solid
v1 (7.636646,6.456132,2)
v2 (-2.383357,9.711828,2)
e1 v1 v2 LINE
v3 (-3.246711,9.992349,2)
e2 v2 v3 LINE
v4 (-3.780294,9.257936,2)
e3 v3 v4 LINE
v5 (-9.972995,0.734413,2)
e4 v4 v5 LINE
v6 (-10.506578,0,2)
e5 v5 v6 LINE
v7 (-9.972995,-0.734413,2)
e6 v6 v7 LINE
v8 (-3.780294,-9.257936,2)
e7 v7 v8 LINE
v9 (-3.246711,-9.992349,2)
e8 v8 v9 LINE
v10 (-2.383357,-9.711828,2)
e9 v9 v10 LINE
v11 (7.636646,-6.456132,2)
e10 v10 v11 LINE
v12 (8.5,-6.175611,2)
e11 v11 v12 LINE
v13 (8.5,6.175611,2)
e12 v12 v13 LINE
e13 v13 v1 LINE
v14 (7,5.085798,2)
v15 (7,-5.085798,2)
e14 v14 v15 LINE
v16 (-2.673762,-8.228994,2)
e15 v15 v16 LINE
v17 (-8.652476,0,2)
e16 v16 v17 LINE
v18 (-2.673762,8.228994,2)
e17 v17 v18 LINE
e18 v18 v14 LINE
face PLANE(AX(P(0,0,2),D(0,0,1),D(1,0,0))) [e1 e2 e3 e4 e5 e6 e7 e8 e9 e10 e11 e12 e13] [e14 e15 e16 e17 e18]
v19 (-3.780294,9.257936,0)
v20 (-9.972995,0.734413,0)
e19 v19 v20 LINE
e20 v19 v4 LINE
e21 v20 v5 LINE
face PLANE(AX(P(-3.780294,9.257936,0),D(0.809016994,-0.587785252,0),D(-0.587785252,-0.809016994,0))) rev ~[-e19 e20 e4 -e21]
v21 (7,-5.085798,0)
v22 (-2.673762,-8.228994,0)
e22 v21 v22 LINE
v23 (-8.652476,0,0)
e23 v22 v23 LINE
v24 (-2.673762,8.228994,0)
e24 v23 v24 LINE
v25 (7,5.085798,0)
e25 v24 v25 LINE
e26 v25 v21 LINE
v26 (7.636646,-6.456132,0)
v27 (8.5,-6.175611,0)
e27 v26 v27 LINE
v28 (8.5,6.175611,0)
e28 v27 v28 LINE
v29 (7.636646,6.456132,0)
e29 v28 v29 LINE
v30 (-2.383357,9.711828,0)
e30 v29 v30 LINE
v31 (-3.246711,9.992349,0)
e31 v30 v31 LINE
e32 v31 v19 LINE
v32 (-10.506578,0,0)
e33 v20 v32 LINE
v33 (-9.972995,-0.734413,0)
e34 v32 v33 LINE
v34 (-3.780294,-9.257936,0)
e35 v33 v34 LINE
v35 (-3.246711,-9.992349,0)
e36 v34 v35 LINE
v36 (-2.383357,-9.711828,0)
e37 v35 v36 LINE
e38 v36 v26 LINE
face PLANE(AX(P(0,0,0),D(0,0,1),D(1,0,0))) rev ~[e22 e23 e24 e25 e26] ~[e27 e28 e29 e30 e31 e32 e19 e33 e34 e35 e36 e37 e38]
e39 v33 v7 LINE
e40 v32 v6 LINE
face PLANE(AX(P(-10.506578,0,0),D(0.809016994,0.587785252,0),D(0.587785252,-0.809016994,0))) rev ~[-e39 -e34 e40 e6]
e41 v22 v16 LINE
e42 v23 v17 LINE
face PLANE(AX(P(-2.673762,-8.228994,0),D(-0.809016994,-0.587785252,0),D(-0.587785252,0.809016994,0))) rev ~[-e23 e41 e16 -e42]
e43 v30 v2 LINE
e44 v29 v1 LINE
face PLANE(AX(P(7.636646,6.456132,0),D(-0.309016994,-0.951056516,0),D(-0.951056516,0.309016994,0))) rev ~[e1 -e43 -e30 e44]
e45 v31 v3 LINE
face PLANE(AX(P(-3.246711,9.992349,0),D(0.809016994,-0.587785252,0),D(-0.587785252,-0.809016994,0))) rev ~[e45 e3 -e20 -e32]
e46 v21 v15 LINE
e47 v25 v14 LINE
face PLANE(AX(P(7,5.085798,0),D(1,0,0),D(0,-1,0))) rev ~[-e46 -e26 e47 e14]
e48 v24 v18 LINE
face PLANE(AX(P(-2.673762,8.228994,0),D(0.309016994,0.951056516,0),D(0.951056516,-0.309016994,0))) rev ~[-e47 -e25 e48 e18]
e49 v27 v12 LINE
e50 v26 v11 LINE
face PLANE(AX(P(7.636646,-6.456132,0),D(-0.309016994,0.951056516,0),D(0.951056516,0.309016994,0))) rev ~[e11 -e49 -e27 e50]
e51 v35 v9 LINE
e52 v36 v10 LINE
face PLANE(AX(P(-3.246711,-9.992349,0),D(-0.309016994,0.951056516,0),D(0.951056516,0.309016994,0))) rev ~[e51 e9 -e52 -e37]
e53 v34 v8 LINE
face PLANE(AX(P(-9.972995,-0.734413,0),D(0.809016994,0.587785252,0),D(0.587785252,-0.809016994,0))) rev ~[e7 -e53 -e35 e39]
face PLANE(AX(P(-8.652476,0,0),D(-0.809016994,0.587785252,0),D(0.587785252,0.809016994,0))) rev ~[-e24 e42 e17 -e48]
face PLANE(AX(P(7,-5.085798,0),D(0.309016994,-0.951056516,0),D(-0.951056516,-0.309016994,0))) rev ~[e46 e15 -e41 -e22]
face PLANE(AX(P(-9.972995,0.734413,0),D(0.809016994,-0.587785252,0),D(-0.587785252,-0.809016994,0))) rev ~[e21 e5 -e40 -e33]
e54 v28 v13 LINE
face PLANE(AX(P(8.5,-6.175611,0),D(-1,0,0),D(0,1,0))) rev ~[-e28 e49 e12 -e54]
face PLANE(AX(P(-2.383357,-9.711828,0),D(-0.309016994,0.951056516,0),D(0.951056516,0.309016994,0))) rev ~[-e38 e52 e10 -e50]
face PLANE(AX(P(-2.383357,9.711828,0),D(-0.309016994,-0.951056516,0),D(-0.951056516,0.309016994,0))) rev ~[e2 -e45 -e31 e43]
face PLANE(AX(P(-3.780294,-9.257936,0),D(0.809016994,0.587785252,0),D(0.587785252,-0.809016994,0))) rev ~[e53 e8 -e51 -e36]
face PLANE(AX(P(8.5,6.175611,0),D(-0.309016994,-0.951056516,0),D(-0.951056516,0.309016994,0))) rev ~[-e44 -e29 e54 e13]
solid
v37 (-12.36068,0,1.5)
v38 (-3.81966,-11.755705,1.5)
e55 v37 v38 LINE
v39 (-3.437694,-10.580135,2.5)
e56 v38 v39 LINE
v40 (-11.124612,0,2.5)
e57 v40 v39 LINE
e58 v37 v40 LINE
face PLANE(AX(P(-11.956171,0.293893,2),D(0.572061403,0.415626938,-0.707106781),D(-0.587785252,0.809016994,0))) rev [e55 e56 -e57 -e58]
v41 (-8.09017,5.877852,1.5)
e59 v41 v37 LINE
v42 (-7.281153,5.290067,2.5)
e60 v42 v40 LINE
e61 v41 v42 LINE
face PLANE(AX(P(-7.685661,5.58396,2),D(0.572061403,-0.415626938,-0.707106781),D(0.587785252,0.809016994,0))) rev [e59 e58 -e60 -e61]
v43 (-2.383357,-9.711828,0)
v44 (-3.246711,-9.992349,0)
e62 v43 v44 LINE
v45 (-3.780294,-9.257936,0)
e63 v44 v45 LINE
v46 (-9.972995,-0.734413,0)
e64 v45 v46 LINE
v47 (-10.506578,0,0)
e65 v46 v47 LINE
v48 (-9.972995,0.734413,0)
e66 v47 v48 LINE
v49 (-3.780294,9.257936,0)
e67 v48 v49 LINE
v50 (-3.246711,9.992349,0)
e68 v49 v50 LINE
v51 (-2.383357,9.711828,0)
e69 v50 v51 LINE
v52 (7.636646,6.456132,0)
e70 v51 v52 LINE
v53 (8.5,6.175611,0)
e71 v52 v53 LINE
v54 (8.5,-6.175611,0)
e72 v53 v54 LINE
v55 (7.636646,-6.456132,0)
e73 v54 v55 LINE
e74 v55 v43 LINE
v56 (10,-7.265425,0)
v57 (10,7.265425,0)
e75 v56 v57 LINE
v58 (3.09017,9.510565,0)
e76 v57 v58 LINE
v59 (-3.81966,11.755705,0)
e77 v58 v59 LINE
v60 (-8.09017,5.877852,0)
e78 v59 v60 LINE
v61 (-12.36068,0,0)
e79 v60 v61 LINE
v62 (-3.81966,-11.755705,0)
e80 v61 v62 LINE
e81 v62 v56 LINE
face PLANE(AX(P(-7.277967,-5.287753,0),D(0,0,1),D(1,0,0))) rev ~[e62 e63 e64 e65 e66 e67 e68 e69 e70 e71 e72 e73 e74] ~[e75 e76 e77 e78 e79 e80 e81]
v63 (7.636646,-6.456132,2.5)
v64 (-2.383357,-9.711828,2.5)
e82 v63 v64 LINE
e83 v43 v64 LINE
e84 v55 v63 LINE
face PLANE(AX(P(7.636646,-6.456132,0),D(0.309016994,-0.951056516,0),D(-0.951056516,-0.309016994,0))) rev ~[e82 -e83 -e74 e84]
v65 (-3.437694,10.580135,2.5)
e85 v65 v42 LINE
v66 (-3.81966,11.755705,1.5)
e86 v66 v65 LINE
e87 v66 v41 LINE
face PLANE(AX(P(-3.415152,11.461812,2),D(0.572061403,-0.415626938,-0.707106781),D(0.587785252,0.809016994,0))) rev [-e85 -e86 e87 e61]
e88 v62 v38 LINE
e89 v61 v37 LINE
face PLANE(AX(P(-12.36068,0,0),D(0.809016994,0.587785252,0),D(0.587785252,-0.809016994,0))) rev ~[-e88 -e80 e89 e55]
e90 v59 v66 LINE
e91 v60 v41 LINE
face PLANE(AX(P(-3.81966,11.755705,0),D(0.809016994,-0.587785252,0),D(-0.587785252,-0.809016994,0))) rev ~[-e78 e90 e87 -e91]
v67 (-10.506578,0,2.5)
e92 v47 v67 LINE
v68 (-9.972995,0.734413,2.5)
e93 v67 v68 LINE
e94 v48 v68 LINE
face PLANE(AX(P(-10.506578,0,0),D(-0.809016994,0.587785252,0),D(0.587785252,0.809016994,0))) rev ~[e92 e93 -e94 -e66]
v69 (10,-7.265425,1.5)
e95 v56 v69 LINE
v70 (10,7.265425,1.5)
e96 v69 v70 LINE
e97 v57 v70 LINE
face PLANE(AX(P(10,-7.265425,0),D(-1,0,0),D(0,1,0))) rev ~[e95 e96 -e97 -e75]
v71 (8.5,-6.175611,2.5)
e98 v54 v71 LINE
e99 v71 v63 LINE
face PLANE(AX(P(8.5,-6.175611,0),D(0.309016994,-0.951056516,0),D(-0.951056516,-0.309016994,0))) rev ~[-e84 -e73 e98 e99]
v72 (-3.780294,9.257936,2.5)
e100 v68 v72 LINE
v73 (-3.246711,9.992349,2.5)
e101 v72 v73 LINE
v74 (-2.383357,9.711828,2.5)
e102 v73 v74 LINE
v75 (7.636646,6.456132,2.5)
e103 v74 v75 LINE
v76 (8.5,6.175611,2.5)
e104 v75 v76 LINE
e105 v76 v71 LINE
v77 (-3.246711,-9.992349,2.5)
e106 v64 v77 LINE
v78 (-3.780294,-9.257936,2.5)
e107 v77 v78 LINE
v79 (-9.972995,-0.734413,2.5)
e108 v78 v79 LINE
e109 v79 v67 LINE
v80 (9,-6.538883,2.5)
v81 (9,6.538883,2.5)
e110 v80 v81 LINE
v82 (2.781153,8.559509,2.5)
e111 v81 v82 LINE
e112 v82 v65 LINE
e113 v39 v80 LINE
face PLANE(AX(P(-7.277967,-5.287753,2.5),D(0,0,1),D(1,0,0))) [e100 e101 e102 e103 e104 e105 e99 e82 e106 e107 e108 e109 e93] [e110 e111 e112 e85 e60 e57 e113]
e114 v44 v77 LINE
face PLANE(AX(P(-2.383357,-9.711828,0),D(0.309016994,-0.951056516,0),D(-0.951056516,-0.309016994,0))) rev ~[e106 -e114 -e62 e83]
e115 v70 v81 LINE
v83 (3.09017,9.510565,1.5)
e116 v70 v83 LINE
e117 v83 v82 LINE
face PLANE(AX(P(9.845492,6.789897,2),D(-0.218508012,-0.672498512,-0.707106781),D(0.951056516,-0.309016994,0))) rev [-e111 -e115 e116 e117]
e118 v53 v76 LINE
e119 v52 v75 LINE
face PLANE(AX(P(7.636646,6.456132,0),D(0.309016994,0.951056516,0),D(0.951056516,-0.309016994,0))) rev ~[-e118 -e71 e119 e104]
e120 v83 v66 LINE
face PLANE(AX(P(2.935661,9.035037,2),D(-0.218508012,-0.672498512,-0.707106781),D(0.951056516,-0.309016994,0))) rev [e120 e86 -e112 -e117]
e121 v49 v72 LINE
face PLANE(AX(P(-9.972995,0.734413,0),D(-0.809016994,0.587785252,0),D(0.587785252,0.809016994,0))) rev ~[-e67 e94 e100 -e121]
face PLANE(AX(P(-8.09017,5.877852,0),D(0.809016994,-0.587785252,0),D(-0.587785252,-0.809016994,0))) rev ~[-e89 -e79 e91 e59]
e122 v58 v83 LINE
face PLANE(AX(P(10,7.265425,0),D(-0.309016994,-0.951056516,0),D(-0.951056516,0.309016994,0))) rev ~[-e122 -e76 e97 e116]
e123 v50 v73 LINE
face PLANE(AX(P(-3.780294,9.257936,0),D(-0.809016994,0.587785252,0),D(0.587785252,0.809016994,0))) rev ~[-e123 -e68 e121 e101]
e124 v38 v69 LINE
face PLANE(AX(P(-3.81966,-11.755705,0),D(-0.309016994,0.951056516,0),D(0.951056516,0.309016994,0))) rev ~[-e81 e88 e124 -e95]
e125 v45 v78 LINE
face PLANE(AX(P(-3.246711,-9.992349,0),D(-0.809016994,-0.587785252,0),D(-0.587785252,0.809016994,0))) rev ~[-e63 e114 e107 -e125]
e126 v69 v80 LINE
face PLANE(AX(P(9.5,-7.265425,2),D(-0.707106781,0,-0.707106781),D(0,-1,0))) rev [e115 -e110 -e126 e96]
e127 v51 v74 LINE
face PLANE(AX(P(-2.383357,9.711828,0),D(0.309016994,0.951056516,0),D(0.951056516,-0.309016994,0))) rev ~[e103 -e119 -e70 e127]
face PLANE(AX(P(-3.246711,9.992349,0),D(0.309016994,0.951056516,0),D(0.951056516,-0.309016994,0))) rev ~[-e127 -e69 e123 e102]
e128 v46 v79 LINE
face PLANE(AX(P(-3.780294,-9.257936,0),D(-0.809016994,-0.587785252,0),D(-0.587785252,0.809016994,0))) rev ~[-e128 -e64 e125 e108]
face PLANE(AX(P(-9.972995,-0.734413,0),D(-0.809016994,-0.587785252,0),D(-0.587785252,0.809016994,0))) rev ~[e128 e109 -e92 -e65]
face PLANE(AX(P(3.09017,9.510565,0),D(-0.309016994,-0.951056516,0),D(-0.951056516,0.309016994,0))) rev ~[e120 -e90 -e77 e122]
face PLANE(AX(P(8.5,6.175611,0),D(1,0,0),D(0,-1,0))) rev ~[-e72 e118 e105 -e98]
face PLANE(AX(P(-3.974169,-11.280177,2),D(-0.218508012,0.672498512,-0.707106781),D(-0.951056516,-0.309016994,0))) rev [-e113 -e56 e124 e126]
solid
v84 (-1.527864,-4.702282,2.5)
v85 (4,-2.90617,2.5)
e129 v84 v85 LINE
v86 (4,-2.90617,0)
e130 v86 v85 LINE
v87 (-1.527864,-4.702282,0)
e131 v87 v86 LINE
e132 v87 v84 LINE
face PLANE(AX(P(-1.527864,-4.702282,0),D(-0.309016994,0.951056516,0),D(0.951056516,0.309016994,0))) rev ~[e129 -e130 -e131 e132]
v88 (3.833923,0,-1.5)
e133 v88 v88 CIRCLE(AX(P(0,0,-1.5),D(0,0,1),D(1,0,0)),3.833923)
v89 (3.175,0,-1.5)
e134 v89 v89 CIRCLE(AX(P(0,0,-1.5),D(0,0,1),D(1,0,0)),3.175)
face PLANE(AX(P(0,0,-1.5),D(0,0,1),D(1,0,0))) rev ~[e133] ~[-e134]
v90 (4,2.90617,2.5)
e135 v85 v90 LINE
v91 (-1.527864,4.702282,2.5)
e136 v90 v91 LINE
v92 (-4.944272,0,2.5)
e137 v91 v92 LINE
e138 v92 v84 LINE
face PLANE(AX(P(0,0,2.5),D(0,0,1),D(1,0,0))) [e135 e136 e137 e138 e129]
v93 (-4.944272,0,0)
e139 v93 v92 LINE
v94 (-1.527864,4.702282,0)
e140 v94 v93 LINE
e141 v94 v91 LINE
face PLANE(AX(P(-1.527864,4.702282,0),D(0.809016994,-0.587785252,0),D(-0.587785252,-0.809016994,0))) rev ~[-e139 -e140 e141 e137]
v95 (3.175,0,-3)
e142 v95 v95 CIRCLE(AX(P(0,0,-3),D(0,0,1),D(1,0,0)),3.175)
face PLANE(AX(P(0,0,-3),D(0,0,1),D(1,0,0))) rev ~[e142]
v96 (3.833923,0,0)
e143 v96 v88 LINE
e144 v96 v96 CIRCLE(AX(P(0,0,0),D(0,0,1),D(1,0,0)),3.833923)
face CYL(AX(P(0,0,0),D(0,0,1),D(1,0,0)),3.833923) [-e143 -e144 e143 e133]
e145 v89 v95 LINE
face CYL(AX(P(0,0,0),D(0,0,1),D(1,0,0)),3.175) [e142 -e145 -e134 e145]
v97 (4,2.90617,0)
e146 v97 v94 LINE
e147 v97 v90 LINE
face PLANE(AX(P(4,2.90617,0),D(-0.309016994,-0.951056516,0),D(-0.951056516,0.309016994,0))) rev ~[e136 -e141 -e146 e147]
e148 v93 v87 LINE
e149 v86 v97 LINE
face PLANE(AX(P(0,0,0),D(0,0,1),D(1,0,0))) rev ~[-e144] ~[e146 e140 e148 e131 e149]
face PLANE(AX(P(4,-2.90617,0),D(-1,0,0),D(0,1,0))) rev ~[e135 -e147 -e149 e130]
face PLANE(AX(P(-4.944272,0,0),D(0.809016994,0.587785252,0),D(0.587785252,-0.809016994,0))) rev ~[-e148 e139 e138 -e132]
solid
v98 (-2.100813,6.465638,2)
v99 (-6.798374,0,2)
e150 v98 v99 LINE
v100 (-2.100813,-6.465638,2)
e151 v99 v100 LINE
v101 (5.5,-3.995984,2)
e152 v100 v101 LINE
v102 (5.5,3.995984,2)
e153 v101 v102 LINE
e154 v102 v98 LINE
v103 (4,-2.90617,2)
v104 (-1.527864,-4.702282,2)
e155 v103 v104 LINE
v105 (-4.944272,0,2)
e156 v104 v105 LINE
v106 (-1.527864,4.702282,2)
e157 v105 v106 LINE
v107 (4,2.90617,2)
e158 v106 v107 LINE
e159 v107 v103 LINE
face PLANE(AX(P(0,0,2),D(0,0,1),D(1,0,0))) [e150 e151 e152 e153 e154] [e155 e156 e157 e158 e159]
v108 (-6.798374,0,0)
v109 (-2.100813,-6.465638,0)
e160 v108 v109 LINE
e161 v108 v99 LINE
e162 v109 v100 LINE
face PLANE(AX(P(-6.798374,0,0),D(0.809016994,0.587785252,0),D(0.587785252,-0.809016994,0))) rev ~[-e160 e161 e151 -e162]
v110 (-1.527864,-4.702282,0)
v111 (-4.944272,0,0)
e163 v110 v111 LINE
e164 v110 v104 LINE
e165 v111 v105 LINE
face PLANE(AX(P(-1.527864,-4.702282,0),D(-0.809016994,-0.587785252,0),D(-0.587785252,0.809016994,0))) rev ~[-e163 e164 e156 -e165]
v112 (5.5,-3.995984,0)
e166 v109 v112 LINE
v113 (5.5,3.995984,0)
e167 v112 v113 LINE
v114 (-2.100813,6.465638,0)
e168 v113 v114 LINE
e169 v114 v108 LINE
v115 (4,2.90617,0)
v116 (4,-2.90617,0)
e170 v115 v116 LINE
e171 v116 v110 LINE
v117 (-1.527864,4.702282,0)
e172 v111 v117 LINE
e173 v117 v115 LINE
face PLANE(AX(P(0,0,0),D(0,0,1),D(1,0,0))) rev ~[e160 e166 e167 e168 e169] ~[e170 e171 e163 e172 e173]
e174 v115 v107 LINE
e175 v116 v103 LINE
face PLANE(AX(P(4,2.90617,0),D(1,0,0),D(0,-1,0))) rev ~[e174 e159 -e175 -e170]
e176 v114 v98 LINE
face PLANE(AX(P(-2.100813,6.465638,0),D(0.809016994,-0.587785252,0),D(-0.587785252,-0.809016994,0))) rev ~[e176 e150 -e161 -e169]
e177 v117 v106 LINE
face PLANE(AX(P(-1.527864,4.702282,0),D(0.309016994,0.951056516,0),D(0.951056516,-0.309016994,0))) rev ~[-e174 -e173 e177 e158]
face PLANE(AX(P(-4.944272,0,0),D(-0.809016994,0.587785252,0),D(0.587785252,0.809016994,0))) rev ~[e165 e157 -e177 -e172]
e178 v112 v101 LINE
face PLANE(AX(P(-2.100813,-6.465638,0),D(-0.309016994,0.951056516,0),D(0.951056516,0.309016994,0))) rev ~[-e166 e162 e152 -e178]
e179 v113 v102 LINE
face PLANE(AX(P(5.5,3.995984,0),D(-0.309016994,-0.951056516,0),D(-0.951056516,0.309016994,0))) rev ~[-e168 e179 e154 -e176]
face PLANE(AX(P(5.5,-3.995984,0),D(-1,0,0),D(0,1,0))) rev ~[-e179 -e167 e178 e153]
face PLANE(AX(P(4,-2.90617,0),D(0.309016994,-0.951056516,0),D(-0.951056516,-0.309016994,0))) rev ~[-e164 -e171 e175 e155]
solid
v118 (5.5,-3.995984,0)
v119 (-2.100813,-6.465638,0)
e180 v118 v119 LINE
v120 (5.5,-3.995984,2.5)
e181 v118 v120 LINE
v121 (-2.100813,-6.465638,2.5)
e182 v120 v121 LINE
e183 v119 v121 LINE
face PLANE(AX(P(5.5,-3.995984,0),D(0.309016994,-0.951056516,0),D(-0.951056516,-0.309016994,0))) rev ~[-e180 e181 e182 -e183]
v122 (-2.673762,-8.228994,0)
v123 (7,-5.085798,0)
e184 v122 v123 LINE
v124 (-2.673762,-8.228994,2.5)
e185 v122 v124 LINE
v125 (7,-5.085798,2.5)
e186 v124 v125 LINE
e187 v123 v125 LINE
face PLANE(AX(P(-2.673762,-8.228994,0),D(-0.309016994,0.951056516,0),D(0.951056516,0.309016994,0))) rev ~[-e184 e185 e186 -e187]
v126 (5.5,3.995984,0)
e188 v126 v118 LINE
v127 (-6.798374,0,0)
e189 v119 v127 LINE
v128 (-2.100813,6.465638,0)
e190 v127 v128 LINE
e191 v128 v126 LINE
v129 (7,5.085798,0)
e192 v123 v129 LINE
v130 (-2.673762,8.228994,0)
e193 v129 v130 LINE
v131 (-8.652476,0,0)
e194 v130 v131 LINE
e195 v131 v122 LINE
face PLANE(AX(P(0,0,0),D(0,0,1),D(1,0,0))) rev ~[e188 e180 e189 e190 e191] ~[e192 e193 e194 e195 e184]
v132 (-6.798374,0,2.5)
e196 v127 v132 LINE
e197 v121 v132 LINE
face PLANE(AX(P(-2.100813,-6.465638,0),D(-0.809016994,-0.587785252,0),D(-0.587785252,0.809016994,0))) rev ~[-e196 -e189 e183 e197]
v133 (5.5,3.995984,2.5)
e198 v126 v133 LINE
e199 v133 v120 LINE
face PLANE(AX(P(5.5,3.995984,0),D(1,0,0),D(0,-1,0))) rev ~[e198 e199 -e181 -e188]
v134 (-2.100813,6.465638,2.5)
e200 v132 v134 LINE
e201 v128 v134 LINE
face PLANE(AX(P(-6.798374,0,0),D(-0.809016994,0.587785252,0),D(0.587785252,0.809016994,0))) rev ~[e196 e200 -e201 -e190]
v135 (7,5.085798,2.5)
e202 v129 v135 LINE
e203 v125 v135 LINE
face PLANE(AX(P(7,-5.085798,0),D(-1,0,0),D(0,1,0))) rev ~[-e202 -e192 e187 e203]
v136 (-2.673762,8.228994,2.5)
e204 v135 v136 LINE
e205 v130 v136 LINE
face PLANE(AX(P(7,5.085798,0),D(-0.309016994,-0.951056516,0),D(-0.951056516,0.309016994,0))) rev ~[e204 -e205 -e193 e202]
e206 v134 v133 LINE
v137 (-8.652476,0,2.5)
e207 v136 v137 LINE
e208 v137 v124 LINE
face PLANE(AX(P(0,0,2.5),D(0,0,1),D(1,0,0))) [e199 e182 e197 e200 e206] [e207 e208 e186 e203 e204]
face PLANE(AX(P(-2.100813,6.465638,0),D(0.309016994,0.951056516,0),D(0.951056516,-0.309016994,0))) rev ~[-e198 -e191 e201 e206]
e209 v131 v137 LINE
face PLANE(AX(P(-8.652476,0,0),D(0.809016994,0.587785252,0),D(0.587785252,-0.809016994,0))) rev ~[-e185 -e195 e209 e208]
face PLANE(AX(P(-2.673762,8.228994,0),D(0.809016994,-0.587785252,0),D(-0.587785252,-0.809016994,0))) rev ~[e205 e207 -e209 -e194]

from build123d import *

# Parameters (mm, degrees)
F0_R     = 3.8339233168
F0_R_2   = 3.175
F1_DEPTH = 2.5
F2_SIZE  = 1
F3_DEPTH = 3
F4_DEPTH = 1.5
F5_DEPTH = 2


with BuildPart() as f1:
    # F0 (on Top) → F1 (new body)
    with BuildSketch(Plane.XY):
        Polygon((4, -2.906170112), (4, 2.906170112), (-1.527864045, 4.7022820183), (-4.94427191, 0), (-1.527864045, -4.7022820183), align=None)
        Circle(F0_R, mode=Mode.SUBTRACT)
        Circle(F0_R)
        Circle(F0_R_2, mode=Mode.SUBTRACT)
        Circle(F0_R_2)
    extrude(amount=F1_DEPTH)

    # F0 (on Top) → F3 (join)
    with BuildSketch(Plane.XY):
        Circle(F0_R_2)
    extrude(amount=-F3_DEPTH)

    # F0 (on Top) → F4 (join)
    with BuildSketch(Plane.XY):
        Circle(F0_R)
        Circle(F0_R_2, mode=Mode.SUBTRACT)
    extrude(amount=-F4_DEPTH)


with BuildPart() as f1b:
    # F0 (on Top) → F1, piece 2 (new body)
    with BuildSketch(Plane.XY):
        Polygon((7, -5.085797696), (7, 5.085797696), (-2.6737620788, 8.2289935321), (-8.6524758425, 0), (-2.6737620788, -8.2289935321), align=None)
        Polygon((-2.1008130619, 6.4656377752), (5.5, 3.995983904), (5.5, -3.995983904), (-2.1008130619, -6.4656377752), (-6.7983738762, 0), align=None, mode=Mode.SUBTRACT)
    extrude(amount=F1_DEPTH)


with BuildPart() as f1c:
    # F0 (on Top) → F1, piece 3 (new body)
    with BuildSketch(Plane.XY):
        with BuildLine():
            ThreePointArc((-8.0901700058, -5.8778524375), (-6.1711601329, -7.8687217904), (-3.7802935026, -9.2579361109))
            Line((-3.7802935026, -9.2579361109), (-9.9729954018, -0.734413178))
            ThreePointArc((-9.9729954018, -0.734413178), (-9.390592526, -3.4375532011), (-8.0901700058, -5.8778524375))
        make_face()
        with BuildLine():
            ThreePointArc((-9.9729954018, 0.734413178), (-9.3905925168, 3.4375532262), (-8.0901699744, 5.8778524807))
            Line((-8.0901699744, 5.8778524807), (-12.360679775, 0))
            Line((-12.360679775, 0), (-8.0901700058, -5.8778524375))
            ThreePointArc((-8.0901700058, -5.8778524375), (-9.390592526, -3.4375532011), (-9.9729954018, -0.734413178))
            Line((-9.9729954018, -0.734413178), (-10.5065778087, 0))
            Line((-10.5065778087, 0), (-9.9729954018, 0.734413178))
        make_face()
        with BuildLine():
            Line((-3.8196601125, -11.7557050458), (3.0901696906, -9.5105652452))
            ThreePointArc((3.0901696906, -9.5105652452), (0.367454614, -9.9932465749), (-2.3833566254, -9.7118284167))
            Line((-2.3833566254, -9.7118284167), (-3.2467110956, -9.992349289))
            Line((-3.2467110956, -9.992349289), (-3.7802935026, -9.2579361109))
            ThreePointArc((-3.7802935026, -9.2579361109), (-6.1711601329, -7.8687217904), (-8.0901700058, -5.8778524375))
            Line((-8.0901700058, -5.8778524375), (-3.8196601125, -11.7557050458))
        make_face()
        with BuildLine():
            ThreePointArc((3.0901696906, -9.5105652452), (5.5766057109, -8.3006908595), (7.6366455297, -6.4561323603))
            Line((7.6366455297, -6.4561323603), (-2.3833566254, -9.7118284167))
            ThreePointArc((-2.3833566254, -9.7118284167), (0.367454614, -9.9932465749), (3.0901696906, -9.5105652452))
        make_face()
        with BuildLine():
            Line((10, -7.2654252801), (10, 0))
            ThreePointArc((10, 0), (9.6176920308, -2.7386127875), (8.5, -5.2678268764))
            Line((8.5, -5.2678268764), (8.5, -6.175611488))
            Line((8.5, -6.175611488), (7.6366455297, -6.4561323603))
            ThreePointArc((7.6366455297, -6.4561323603), (5.5766057109, -8.3006908595), (3.0901696906, -9.5105652452))
            Line((3.0901696906, -9.5105652452), (10, -7.2654252801))
        make_face()
        with BuildLine():
            ThreePointArc((8.5, -5.2678268764), (9.6176920308, -2.7386127875), (10, 0))
            ThreePointArc((10, 0), (9.6176920308, 2.7386127875), (8.5, 5.2678268764))
            Line((8.5, 5.2678268764), (8.5, -5.2678268764))
        make_face()
        with BuildLine():
            ThreePointArc((8.5, 5.2678268764), (9.6176920308, 2.7386127875), (10, 0))
            Line((10, 0), (10, 7.2654252801))
            Line((10, 7.2654252801), (3.0901697709, 9.5105652191))
            ThreePointArc((3.0901697709, 9.5105652191), (5.5766057459, 8.300690836), (7.6366455297, 6.4561323603))
            Line((7.6366455297, 6.4561323603), (8.5, 6.175611488))
            Line((8.5, 6.175611488), (8.5, 5.2678268764))
        make_face()
        with BuildLine():
            ThreePointArc((-2.3833566254, 9.7118284167), (0.3674546562, 9.9932465733), (3.0901697709, 9.5105652191))
            Line((3.0901697709, 9.5105652191), (-3.8196601125, 11.7557050458))
            Line((-3.8196601125, 11.7557050458), (-8.0901699744, 5.8778524807))
            ThreePointArc((-8.0901699744, 5.8778524807), (-6.1711601119, 7.8687218068), (-3.7802935026, 9.2579361109))
            Line((-3.7802935026, 9.2579361109), (-3.2467110956, 9.992349289))
            Line((-3.2467110956, 9.992349289), (-2.3833566254, 9.7118284167))
        make_face()
        with BuildLine():
            Line((-9.9729954018, 0.734413178), (-3.7802935026, 9.2579361109))
            ThreePointArc((-3.7802935026, 9.2579361109), (-6.1711601119, 7.8687218068), (-8.0901699744, 5.8778524807))
            ThreePointArc((-8.0901699744, 5.8778524807), (-9.3905925168, 3.4375532262), (-9.9729954018, 0.734413178))
        make_face()
        with BuildLine():
            Line((-2.3833566254, 9.7118284167), (7.6366455297, 6.4561323603))
            ThreePointArc((7.6366455297, 6.4561323603), (5.5766057459, 8.300690836), (3.0901697709, 9.5105652191))
            ThreePointArc((3.0901697709, 9.5105652191), (0.3674546562, 9.9932465733), (-2.3833566254, 9.7118284167))
        make_face()
    extrude(amount=F1_DEPTH)

    # F2
    f2_edges = [f1c.edges().sort_by_distance(p)[0] for p in [
        (3.09017, 9.510565, 2.5),
        (-8.09017, 5.877853, 2.5),
        (-8.09017, -5.877853, 2.5),
        (3.09017, -9.510565, 2.5),
        (10, 0, 2.5),
    ]]
    chamfer(f2_edges, length=F2_SIZE)


with BuildPart() as f5:
    # F0 (on Top) → F5 (new body)
    with BuildSketch(Plane.XY):
        with BuildLine():
            Line((8.5, -5.2678268764), (8.5, 5.2678268764))
            ThreePointArc((8.5, 5.2678268764), (8.0901699437, 5.8778525229), (7.6366455297, 6.4561323603))
            Line((7.6366455297, 6.4561323603), (-2.3833566254, 9.7118284167))
            ThreePointArc((-2.3833566254, 9.7118284167), (-3.0901699437, 9.510565163), (-3.7802935026, 9.2579361109))
            Line((-3.7802935026, 9.2579361109), (-9.9729954018, 0.734413178))
            ThreePointArc((-9.9729954018, 0.734413178), (-10, 0), (-9.9729954018, -0.734413178))
            Line((-9.9729954018, -0.734413178), (-3.7802935026, -9.2579361109))
            ThreePointArc((-3.7802935026, -9.2579361109), (-3.0901699437, -9.510565163), (-2.3833566254, -9.7118284167))
            Line((-2.3833566254, -9.7118284167), (7.6366455297, -6.4561323603))
            ThreePointArc((7.6366455297, -6.4561323603), (8.0901699437, -5.8778525229), (8.5, -5.2678268764))
        make_face()
        Polygon((-2.6737620788, 8.2289935321), (7, 5.085797696), (7, -5.085797696), (-2.6737620788, -8.2289935321), (-8.6524758425, 0), align=None, mode=Mode.SUBTRACT)
        with BuildLine():
            ThreePointArc((-9.9729954018, -0.734413178), (-10, 0), (-9.9729954018, 0.734413178))
            Line((-9.9729954018, 0.734413178), (-10.5065778087, 0))
            Line((-10.5065778087, 0), (-9.9729954018, -0.734413178))
        make_face()
        with BuildLine():
            ThreePointArc((-3.7802935026, 9.2579361109), (-3.0901699437, 9.510565163), (-2.3833566254, 9.7118284167))
            Line((-2.3833566254, 9.7118284167), (-3.2467110956, 9.992349289))
            Line((-3.2467110956, 9.992349289), (-3.7802935026, 9.2579361109))
        make_face()
        with BuildLine():
            ThreePointArc((7.6366455297, 6.4561323603), (8.0901699437, 5.8778525229), (8.5, 5.2678268764))
            Line((8.5, 5.2678268764), (8.5, 6.175611488))
            Line((8.5, 6.175611488), (7.6366455297, 6.4561323603))
        make_face()
        with BuildLine():
            Line((8.5, -6.175611488), (8.5, -5.2678268764))
            ThreePointArc((8.5, -5.2678268764), (8.0901699437, -5.8778525229), (7.6366455297, -6.4561323603))
            Line((7.6366455297, -6.4561323603), (8.5, -6.175611488))
        make_face()
        with BuildLine():
            Line((-3.2467110956, -9.992349289), (-2.3833566254, -9.7118284167))
            ThreePointArc((-2.3833566254, -9.7118284167), (-3.0901699437, -9.510565163), (-3.7802935026, -9.2579361109))
            Line((-3.7802935026, -9.2579361109), (-3.2467110956, -9.992349289))
        make_face()
    extrude(amount=F5_DEPTH)


with BuildPart() as f5b:
    # F0 (on Top) → F5, piece 2 (new body)
    with BuildSketch(Plane.XY):
        Polygon((5.5, -3.995983904), (5.5, 3.995983904), (-2.1008130619, 6.4656377752), (-6.7983738762, 0), (-2.1008130619, -6.4656377752), align=None)
        Polygon((-1.527864045, 4.7022820183), (4, 2.906170112), (4, -2.906170112), (-1.527864045, -4.7022820183), (-4.94427191, 0), align=None, mode=Mode.SUBTRACT)
    extrude(amount=F5_DEPTH)


solid = Compound([f1.part, f1b.part, f1c.part, f5.part, f5b.part])
